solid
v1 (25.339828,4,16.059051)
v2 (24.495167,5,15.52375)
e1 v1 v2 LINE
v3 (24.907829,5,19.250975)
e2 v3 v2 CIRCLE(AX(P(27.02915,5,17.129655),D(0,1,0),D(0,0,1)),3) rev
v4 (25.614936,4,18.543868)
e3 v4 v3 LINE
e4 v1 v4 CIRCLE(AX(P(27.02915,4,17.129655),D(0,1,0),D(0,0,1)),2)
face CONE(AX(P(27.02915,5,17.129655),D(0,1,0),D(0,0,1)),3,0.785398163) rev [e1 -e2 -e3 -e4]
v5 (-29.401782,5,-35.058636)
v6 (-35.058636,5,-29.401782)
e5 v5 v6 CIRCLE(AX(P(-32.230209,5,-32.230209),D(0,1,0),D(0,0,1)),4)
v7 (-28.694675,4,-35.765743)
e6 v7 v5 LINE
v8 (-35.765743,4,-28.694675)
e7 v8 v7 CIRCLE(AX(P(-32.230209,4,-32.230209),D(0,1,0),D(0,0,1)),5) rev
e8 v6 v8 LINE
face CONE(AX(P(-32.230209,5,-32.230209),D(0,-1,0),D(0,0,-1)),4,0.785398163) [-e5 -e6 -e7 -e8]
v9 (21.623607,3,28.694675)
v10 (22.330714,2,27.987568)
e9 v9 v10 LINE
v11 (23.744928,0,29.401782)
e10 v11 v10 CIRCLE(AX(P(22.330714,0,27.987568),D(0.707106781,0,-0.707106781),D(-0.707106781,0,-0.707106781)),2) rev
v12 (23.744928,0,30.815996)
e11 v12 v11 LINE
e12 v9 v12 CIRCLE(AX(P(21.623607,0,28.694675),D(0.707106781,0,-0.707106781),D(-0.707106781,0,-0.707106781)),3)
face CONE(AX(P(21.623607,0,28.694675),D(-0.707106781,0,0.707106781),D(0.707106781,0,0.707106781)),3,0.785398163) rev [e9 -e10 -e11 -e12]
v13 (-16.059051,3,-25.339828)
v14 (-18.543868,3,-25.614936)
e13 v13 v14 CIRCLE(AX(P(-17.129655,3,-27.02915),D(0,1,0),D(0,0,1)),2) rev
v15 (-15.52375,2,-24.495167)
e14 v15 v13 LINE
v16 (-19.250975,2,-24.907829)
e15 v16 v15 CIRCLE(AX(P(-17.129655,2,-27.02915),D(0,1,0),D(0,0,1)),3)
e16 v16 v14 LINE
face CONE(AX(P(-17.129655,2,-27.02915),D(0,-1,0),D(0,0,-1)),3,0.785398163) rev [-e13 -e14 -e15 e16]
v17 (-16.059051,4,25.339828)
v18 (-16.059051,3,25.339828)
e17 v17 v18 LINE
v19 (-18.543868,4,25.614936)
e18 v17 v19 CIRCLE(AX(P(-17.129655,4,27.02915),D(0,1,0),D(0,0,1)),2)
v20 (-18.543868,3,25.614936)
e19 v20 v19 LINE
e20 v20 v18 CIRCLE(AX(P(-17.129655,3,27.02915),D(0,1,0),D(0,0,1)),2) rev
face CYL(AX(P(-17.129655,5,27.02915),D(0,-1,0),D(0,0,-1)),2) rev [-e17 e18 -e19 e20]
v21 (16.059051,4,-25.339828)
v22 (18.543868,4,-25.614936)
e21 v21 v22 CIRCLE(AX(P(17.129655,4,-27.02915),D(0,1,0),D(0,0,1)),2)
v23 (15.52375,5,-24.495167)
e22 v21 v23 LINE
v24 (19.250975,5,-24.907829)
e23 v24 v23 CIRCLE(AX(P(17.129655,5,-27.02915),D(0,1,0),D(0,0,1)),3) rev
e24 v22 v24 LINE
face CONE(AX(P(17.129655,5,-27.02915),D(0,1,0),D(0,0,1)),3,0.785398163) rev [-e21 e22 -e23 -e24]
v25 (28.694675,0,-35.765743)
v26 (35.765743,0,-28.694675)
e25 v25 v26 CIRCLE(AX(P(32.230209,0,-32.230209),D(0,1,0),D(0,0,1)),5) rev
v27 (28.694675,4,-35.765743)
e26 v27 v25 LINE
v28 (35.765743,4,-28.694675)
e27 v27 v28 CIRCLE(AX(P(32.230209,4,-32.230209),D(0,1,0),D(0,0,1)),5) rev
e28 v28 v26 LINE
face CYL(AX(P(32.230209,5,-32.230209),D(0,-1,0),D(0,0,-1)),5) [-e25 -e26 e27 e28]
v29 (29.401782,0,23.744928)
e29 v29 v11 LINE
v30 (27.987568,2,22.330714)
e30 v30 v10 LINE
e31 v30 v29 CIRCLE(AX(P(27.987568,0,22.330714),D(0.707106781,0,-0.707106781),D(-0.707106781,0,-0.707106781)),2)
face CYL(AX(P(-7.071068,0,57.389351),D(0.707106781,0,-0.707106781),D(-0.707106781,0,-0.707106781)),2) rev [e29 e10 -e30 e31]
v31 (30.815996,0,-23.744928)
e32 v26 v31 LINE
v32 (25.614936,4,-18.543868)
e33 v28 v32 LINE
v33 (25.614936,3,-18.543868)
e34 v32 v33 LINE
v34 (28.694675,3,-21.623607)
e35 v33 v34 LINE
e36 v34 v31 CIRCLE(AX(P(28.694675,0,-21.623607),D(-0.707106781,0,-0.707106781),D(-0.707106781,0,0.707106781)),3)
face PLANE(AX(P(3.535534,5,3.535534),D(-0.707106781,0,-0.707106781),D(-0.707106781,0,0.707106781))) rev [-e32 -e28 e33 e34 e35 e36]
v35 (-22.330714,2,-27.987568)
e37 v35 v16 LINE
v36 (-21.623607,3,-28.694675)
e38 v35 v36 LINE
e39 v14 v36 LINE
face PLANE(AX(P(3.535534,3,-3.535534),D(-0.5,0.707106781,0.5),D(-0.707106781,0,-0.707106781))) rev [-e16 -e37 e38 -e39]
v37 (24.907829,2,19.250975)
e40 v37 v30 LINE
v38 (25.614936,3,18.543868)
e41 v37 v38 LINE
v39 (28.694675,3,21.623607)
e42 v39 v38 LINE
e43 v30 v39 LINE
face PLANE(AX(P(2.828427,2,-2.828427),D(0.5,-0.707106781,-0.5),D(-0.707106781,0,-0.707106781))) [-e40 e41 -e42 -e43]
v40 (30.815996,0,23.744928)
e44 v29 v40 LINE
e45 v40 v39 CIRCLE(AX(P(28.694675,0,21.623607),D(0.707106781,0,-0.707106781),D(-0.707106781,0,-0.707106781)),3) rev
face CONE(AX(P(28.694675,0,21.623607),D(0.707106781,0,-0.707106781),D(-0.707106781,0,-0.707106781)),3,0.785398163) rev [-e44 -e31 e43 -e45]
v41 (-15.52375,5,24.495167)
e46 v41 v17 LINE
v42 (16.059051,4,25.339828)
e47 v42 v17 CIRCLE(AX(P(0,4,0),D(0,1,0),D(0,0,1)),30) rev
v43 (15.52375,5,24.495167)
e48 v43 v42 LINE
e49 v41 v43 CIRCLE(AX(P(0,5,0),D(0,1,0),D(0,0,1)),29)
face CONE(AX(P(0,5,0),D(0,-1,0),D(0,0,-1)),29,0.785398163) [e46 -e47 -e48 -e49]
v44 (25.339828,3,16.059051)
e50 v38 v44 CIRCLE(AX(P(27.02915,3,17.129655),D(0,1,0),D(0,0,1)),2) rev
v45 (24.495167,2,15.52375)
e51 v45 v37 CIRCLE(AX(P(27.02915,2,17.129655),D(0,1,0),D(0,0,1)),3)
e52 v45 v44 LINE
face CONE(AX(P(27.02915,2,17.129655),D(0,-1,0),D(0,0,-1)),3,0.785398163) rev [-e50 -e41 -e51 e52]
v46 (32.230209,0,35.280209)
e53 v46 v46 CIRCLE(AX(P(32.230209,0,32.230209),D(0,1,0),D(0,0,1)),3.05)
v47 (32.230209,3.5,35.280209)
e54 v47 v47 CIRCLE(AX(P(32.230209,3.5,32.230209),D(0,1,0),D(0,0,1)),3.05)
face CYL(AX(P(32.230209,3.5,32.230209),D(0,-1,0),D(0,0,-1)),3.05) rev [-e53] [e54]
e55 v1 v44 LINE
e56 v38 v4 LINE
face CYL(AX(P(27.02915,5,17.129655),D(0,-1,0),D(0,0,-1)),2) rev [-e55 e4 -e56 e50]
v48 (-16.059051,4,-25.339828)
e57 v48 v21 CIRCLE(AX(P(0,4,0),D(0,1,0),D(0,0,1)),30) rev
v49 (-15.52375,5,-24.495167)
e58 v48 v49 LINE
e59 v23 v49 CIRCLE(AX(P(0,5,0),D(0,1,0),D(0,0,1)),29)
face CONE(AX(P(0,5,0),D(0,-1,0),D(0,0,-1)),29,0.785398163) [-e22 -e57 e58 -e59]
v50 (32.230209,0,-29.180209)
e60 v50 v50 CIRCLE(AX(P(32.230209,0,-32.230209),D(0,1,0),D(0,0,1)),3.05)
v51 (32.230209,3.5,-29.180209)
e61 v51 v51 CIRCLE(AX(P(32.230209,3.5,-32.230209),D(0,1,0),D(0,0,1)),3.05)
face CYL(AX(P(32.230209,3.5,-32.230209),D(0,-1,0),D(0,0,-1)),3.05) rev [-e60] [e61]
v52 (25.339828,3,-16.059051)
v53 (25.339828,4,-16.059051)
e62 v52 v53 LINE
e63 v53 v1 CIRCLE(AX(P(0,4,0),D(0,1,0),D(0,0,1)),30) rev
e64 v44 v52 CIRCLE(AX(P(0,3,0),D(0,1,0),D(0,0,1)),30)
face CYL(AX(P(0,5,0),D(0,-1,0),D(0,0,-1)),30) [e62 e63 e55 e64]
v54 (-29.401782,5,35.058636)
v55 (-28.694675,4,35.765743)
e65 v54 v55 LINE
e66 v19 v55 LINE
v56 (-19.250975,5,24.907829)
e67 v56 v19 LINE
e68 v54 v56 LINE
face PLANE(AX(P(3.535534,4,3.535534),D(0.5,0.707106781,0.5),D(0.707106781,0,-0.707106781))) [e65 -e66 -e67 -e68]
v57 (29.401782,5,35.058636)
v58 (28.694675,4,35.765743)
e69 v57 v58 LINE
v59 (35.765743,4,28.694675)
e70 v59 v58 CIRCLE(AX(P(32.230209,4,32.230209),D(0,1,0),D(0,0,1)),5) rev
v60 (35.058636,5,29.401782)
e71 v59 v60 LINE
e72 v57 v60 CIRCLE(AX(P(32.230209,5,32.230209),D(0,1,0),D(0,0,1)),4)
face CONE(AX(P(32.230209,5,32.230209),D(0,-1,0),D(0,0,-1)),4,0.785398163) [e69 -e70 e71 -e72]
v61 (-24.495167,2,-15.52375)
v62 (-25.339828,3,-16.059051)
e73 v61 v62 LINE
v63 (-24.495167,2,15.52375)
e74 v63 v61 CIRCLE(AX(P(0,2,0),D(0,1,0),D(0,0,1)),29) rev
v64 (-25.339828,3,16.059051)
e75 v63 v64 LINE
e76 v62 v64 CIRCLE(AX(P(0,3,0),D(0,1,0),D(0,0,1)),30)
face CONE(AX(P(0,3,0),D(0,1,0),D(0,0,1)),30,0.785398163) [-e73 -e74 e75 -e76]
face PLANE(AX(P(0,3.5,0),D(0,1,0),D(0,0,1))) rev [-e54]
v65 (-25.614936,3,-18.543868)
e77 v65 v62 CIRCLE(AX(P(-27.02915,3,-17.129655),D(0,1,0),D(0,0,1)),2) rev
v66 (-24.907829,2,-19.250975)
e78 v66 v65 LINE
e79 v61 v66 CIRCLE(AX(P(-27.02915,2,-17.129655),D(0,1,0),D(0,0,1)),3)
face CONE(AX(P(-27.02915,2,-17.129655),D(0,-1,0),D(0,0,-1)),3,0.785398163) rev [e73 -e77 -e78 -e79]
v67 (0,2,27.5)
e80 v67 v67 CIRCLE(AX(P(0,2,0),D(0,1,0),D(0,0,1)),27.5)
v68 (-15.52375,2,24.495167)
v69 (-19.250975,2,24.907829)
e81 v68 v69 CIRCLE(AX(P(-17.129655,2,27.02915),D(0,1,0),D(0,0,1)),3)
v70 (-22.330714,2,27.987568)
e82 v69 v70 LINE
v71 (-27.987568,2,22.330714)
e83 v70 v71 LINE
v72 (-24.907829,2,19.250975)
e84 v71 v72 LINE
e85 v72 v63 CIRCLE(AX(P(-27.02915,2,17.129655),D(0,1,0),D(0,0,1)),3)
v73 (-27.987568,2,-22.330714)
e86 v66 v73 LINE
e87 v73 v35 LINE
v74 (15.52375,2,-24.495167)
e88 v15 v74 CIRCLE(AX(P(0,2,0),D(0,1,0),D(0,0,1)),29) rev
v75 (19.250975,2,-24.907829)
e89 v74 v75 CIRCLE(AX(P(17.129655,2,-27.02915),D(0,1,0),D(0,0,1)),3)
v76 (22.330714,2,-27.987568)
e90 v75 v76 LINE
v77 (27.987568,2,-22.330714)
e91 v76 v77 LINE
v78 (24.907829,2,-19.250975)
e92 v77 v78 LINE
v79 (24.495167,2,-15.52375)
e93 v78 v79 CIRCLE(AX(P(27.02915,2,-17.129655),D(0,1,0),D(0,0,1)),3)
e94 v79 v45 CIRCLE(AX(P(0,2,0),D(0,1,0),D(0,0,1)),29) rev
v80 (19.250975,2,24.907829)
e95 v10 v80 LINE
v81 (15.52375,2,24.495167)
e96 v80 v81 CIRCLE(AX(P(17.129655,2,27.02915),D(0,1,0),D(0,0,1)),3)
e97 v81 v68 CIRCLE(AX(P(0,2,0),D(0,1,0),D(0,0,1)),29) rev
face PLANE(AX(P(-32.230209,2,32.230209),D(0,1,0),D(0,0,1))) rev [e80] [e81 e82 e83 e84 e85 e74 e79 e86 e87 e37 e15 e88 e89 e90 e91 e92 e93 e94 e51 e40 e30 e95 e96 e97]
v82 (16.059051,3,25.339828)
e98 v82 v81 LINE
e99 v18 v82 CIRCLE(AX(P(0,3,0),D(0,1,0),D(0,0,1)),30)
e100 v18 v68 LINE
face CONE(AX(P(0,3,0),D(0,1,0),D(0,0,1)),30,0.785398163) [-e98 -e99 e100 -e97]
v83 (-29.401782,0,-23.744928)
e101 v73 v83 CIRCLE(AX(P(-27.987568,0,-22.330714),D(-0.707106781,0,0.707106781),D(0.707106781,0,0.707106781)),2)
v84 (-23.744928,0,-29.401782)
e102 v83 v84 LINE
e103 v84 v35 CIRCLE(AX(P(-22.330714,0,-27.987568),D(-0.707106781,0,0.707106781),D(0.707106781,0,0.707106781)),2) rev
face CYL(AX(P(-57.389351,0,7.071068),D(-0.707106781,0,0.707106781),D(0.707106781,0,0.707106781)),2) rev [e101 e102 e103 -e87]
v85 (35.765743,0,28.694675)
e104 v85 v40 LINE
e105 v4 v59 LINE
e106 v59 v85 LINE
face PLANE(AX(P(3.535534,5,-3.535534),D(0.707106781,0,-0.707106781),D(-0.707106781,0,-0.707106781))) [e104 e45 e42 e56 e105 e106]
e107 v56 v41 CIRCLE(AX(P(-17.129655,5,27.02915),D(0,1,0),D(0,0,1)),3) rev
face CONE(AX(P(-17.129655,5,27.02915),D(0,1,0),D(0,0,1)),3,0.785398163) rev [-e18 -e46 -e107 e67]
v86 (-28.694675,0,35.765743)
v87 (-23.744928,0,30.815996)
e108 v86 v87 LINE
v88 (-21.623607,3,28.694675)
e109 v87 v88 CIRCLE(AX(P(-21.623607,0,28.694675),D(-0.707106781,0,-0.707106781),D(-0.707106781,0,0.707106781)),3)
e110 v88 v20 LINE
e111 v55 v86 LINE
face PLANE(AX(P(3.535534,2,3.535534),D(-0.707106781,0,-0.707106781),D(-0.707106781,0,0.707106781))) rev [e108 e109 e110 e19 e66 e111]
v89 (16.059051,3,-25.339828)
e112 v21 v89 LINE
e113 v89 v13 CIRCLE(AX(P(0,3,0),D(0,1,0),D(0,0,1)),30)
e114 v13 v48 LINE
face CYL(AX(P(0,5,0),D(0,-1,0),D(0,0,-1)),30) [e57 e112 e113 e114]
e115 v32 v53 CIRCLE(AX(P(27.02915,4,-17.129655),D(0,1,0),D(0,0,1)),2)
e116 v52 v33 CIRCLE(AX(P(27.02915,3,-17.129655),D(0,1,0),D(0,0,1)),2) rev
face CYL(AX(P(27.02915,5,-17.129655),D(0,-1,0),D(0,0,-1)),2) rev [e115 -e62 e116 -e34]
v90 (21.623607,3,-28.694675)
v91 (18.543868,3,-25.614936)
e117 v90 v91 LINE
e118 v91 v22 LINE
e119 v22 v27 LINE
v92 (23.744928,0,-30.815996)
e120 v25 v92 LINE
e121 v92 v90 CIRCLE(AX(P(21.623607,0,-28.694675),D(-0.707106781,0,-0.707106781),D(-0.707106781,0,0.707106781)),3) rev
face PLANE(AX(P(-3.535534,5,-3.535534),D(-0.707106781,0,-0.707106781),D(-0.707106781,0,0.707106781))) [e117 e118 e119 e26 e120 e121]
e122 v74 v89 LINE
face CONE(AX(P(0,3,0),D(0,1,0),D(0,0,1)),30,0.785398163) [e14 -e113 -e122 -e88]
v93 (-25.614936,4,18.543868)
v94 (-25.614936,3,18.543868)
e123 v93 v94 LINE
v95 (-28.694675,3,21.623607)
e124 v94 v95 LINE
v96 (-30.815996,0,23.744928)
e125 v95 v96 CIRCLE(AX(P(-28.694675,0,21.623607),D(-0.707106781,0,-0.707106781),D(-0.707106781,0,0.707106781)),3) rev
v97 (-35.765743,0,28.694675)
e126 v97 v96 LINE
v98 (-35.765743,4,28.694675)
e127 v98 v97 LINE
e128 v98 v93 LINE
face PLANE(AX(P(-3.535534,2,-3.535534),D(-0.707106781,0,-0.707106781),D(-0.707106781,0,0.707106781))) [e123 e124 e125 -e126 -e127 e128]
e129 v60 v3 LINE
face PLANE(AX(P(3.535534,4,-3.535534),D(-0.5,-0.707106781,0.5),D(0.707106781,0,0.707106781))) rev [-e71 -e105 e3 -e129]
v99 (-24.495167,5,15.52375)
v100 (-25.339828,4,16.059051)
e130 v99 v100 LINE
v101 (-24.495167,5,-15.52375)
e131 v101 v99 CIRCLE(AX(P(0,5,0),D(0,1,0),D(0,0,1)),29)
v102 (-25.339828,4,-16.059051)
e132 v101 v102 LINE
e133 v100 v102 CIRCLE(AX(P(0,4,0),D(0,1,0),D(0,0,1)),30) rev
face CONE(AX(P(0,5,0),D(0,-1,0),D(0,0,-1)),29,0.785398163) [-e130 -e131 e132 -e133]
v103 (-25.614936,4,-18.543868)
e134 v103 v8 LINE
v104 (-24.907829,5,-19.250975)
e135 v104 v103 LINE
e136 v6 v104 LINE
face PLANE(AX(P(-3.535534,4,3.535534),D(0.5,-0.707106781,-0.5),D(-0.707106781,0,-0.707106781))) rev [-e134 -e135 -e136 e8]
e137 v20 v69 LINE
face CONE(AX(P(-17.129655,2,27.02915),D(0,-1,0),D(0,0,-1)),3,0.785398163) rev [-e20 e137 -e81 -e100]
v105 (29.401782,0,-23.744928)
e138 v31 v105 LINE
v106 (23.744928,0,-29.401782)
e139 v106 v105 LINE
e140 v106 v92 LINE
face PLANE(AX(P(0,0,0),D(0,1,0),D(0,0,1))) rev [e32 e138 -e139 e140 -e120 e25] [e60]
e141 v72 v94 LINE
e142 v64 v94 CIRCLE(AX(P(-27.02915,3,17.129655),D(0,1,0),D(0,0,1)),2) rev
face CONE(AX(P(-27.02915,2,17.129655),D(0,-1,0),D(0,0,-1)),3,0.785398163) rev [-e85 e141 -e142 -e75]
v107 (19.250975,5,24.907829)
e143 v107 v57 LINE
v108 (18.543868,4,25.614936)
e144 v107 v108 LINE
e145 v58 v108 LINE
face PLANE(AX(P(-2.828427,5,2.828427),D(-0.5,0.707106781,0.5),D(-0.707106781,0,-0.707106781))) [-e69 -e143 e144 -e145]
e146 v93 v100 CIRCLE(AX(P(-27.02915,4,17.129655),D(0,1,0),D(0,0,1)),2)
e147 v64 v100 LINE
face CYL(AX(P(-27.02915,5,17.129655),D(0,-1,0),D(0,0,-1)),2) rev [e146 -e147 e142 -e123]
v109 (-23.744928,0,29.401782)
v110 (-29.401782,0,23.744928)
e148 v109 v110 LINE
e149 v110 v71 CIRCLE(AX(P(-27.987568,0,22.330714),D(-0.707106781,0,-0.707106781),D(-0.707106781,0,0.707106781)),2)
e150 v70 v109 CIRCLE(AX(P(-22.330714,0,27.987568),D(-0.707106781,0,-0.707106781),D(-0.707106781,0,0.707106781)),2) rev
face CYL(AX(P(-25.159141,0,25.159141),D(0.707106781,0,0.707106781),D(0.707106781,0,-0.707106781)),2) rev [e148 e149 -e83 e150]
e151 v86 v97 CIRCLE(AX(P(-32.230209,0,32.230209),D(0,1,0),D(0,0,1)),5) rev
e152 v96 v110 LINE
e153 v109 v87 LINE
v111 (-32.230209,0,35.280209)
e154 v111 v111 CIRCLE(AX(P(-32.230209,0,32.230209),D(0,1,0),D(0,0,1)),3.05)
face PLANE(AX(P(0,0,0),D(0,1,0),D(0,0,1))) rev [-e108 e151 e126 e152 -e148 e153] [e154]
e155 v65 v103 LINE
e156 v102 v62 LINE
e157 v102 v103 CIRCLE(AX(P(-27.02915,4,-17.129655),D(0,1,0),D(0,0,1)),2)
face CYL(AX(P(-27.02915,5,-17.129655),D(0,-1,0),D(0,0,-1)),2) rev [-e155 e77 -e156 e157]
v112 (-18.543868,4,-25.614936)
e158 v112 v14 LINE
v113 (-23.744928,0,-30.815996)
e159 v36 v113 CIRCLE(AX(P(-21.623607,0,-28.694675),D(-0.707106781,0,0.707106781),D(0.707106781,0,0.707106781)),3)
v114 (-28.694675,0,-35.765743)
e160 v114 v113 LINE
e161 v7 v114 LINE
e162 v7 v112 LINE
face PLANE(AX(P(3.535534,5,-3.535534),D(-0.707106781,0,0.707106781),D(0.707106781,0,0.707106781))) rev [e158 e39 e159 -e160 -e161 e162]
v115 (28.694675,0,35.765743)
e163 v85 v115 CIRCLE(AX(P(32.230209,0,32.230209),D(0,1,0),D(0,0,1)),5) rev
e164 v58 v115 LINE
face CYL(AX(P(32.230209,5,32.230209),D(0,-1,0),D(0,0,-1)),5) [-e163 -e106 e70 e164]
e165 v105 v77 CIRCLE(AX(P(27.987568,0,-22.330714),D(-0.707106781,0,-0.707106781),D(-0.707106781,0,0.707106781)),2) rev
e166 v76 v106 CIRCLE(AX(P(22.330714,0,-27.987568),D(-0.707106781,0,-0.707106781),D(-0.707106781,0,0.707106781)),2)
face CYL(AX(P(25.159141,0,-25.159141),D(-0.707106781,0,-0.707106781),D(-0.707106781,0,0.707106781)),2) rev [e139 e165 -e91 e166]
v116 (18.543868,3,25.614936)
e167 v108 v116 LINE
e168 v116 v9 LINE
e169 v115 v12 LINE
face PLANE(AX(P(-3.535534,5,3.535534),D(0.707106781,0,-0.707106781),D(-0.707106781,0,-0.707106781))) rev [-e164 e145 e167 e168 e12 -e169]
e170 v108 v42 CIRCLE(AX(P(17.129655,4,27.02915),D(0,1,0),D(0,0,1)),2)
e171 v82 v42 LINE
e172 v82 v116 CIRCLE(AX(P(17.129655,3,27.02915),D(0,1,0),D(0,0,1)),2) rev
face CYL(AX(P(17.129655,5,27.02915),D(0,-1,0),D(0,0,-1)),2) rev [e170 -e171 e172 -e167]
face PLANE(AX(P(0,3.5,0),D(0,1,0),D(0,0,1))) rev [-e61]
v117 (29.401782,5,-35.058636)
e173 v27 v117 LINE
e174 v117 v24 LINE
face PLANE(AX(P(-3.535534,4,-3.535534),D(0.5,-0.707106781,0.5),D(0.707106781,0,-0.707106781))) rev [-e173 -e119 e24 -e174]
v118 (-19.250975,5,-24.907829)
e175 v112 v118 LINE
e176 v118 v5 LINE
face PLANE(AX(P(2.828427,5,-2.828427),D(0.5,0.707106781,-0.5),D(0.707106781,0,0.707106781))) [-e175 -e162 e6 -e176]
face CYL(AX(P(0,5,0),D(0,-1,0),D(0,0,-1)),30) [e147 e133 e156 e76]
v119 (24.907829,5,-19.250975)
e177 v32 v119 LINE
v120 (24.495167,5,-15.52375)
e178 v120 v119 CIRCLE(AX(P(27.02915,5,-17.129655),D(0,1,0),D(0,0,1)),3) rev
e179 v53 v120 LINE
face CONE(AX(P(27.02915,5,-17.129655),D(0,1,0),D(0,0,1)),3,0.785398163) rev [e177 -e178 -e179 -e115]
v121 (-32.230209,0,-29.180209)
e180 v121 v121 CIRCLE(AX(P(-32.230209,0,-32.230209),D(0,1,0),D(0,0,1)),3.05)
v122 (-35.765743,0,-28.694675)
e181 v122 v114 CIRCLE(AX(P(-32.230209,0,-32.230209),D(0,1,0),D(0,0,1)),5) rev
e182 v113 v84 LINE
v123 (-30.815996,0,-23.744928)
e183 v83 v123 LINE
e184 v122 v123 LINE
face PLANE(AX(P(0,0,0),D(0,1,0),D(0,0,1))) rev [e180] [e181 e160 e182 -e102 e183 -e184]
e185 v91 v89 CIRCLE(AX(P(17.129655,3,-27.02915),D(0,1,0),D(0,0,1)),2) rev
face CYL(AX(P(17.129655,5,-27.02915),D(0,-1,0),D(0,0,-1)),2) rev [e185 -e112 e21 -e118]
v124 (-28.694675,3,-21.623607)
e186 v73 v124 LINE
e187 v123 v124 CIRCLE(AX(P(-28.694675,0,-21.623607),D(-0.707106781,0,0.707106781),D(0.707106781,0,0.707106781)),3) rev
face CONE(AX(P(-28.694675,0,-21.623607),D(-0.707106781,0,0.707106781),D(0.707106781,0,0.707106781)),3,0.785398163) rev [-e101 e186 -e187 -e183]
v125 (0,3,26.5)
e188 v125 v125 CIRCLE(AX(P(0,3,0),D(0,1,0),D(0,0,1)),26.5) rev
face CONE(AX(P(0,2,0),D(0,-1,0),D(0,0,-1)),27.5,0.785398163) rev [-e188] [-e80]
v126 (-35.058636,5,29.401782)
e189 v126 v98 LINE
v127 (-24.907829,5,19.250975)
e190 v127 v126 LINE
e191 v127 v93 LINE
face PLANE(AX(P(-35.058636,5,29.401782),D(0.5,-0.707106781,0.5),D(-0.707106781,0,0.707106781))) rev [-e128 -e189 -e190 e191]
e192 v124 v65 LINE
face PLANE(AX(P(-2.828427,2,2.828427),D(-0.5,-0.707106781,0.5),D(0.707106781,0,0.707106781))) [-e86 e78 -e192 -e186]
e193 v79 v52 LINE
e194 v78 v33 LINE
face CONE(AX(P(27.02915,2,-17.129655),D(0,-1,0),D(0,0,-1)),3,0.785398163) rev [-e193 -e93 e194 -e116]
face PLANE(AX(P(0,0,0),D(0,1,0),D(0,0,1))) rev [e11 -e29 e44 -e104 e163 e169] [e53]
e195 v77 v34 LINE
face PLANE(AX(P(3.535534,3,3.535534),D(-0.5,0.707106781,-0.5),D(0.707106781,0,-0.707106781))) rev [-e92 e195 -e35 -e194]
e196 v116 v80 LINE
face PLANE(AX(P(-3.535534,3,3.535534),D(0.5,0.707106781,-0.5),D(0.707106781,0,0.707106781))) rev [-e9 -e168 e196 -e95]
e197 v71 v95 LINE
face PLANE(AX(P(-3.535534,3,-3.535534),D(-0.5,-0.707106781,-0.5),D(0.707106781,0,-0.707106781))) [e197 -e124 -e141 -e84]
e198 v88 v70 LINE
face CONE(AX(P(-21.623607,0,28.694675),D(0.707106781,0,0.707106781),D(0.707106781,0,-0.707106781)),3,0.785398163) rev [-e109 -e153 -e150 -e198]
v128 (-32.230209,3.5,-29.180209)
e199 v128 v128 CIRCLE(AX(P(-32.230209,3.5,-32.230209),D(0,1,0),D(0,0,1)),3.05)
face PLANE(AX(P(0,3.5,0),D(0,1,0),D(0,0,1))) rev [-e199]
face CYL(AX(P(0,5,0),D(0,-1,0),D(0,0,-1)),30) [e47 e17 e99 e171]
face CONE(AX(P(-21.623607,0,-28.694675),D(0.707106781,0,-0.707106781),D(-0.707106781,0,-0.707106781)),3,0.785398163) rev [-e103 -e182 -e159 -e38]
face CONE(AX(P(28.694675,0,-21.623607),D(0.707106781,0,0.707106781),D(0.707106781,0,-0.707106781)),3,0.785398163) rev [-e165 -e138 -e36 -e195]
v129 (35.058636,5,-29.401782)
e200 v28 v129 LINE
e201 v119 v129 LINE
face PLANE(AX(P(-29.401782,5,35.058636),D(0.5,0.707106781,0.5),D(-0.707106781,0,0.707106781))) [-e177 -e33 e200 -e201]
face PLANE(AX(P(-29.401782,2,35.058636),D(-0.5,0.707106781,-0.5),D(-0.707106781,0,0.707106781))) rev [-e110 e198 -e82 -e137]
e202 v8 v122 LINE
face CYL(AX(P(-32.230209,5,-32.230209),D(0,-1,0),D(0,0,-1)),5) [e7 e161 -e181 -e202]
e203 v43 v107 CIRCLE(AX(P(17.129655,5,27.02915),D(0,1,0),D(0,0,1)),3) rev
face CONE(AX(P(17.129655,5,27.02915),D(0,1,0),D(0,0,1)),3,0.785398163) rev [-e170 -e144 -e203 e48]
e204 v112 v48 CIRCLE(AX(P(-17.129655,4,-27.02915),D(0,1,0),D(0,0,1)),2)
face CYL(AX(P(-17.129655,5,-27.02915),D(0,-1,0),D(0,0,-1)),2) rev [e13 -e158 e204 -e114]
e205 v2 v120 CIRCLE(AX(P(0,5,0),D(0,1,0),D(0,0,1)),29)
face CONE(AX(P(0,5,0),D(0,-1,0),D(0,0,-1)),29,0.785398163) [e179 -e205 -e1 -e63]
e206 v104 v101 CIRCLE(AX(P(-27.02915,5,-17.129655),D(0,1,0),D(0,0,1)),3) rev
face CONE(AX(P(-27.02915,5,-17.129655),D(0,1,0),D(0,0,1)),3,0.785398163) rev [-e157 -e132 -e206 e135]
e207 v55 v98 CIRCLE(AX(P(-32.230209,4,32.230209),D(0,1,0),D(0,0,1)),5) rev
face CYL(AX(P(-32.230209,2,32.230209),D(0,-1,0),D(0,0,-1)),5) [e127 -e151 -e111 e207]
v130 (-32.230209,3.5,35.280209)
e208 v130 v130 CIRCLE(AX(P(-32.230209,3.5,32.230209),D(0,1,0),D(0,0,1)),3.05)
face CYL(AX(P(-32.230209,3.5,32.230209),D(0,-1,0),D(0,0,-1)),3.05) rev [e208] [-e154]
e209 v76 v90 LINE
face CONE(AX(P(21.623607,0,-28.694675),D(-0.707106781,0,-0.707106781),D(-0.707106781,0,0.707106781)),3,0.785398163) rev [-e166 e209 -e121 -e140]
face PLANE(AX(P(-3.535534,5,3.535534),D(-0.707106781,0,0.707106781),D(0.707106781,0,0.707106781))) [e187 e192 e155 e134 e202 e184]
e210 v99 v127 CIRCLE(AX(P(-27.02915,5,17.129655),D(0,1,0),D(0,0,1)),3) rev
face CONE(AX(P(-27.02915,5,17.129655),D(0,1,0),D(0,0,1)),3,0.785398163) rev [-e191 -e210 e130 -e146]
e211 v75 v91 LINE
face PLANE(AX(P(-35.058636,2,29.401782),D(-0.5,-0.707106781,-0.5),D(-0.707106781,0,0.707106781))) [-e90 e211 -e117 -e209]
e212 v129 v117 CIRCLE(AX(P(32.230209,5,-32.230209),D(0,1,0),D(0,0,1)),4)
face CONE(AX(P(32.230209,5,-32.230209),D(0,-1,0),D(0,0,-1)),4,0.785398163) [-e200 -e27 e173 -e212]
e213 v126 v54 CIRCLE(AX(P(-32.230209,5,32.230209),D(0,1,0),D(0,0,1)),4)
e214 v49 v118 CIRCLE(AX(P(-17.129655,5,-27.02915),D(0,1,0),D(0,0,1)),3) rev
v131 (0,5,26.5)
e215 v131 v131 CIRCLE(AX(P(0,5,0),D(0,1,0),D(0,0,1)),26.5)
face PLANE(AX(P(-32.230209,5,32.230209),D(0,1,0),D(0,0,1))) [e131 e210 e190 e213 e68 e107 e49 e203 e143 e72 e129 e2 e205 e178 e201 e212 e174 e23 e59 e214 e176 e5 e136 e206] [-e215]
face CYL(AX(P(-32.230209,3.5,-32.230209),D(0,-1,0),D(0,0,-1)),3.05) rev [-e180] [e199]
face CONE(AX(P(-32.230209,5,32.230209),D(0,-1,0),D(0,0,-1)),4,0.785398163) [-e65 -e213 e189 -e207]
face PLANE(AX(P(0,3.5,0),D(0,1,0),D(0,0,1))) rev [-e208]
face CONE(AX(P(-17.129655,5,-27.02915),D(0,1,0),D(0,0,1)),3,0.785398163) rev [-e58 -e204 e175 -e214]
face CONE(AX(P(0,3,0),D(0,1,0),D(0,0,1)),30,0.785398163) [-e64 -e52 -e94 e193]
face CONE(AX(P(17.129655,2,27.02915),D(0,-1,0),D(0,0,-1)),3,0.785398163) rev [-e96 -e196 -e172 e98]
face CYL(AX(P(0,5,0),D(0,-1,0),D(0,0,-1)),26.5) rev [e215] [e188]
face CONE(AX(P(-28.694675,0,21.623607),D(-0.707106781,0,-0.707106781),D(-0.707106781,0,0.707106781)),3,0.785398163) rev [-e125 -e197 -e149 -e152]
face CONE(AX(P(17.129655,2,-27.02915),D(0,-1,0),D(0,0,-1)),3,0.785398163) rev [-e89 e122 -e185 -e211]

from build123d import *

# Parameters (mm, degrees)
BASE_R              = 3.05
BOSS_EXTRUDE1_DEPTH = 2
BOSS_EXTRUDE2_START = 2
BASE_3_R            = 30
BASE_3_R_2          = 26.5
BASE_3_R_3          = 3.05
BOSS_EXTRUDE2_DEPTH = 3
FILLET1_R           = 2
CHAMFER1_SIZE       = 1
BASE_4_R            = 3.05
CUT_EXTRUDE1_DEPTH  = 3.5


with BuildPart() as part:
    # Base → Boss-Extrude1 (new body)
    # profile 1 of 8: a face of its own
    with BuildSketch(Plane(origin=(0, 0, 0), x_dir=(1, 0, 0), z_dir=(0, 1, 0))):
        with BuildLine():
            Line((-23.037821007, -30.108888819), (-30.108888819, -23.037821007))
            Line((-30.108888819, -23.037821007), (-35.765743068, -28.694675256))
            ThreePointArc((-35.765743068, -28.694675256), (-35.765743068, -35.765743068), (-28.694675256, -35.765743068))
            Line((-28.694675256, -35.765743068), (-23.037821007, -30.108888819))
        make_face()
        with Locations((-32.230209162, -32.230209162)):
            Circle(BASE_R, mode=Mode.SUBTRACT)
    # profile 2 of 8: a face of its own
    with BuildSketch(Plane(origin=(0, 0, 0), x_dir=(1, 0, 0), z_dir=(0, 1, 0))):
        with BuildLine():
            Line((35.765743068, -28.694675256), (30.108888819, -23.037821007))
            Line((30.108888819, -23.037821007), (23.037821007, -30.108888819))
            Line((23.037821007, -30.108888819), (28.694675256, -35.765743068))
            ThreePointArc((28.694675256, -35.765743068), (35.765743068, -35.765743068), (35.765743068, -28.694675256))
        make_face()
        with Locations((32.230209162, -32.230209162)):
            Circle(BASE_R, mode=Mode.SUBTRACT)
    # profile 3 of 8: a face of its own
    with BuildSketch(Plane(origin=(0, 0, 0), x_dir=(1, 0, 0), z_dir=(0, 1, 0))):
        with BuildLine():
            Line((28.694675256, 35.765743068), (23.037821007, 30.108888819))
            Line((23.037821007, 30.108888819), (30.108888819, 23.037821007))
            Line((30.108888819, 23.037821007), (35.765743068, 28.694675256))
            ThreePointArc((35.765743068, 28.694675256), (35.765743068, 35.765743068), (28.694675256, 35.765743068))
        make_face()
        with Locations((32.230209162, 32.230209162)):
            Circle(BASE_R, mode=Mode.SUBTRACT)
    # profile 4 of 8: a face of its own
    with BuildSketch(Plane(origin=(0, 0, 0), x_dir=(1, 0, 0), z_dir=(0, 1, 0))):
        with BuildLine():
            Line((-23.037821007, 30.108888819), (-28.694675256, 35.765743068))
            ThreePointArc((-28.694675256, 35.765743068), (-35.765743068, 35.765743068), (-35.765743068, 28.694675256))
            Line((-35.765743068, 28.694675256), (-30.108888819, 23.037821007))
            Line((-30.108888819, 23.037821007), (-23.037821007, 30.108888819))
        make_face()
        with Locations((-32.230209162, 32.230209162)):
            Circle(BASE_R, mode=Mode.SUBTRACT)
    # profile 5 of 8: a face of its own
    with BuildSketch(Plane(origin=(0, 0, 0), x_dir=(1, 0, 0), z_dir=(0, 1, 0))):
        with Locations((32.230209162, 32.230209162)):
            Circle(BASE_R)
    # profile 6 of 8: a face of its own
    with BuildSketch(Plane(origin=(0, 0, 0), x_dir=(1, 0, 0), z_dir=(0, 1, 0))):
        with Locations((-32.230209162, 32.230209162)):
            Circle(BASE_R)
    # profile 7 of 8: a face of its own
    with BuildSketch(Plane(origin=(0, 0, 0), x_dir=(1, 0, 0), z_dir=(0, 1, 0))):
        with Locations((-32.230209162, -32.230209162)):
            Circle(BASE_R)
    # profile 8 of 8: a face of its own
    with BuildSketch(Plane(origin=(0, 0, 0), x_dir=(1, 0, 0), z_dir=(0, 1, 0))):
        with Locations((32.230209162, -32.230209162)):
            Circle(BASE_R)
    extrude(amount=BOSS_EXTRUDE1_DEPTH)

    # Base<3> → Boss-Extrude2 (add)
    # profile 1 of 13: a face of its own
    with BuildSketch(Plane(origin=(0, 0, 0), x_dir=(1, 0, 0), z_dir=(0, 1, 0)).offset(BOSS_EXTRUDE2_START)):
        Circle(BASE_3_R)
        with Locations(Location((0, 0, 0), (0, 0, 270))):
            Circle(BASE_3_R_2, mode=Mode.SUBTRACT)
    # profile 2 of 13: a face of its own
    with BuildSketch(Plane(origin=(0, 0, 0), x_dir=(1, 0, 0), z_dir=(0, 1, 0)).offset(BOSS_EXTRUDE2_START)):
        with BuildLine():
            ThreePointArc((-17.380966757, -24.452034569), (-21.213203436, -21.213203436), (-24.452034569, -17.380966757))
            Line((-24.452034569, -17.380966757), (-30.108888819, -23.037821007))
            Line((-30.108888819, -23.037821007), (-23.037821007, -30.108888819))
            Line((-23.037821007, -30.108888819), (-17.380966757, -24.452034569))
        make_face()
    # profile 3 of 13: a face of its own
    with BuildSketch(Plane(origin=(0, 0, 0), x_dir=(1, 0, 0), z_dir=(0, 1, 0)).offset(BOSS_EXTRUDE2_START)):
        with BuildLine():
            Line((-23.037821007, -30.108888819), (-30.108888819, -23.037821007))
            Line((-30.108888819, -23.037821007), (-35.765743068, -28.694675256))
            ThreePointArc((-35.765743068, -28.694675256), (-35.765743068, -35.765743068), (-28.694675256, -35.765743068))
            Line((-28.694675256, -35.765743068), (-23.037821007, -30.108888819))
        make_face()
        with Locations((-32.230209162, -32.230209162)):
            Circle(BASE_3_R_3, mode=Mode.SUBTRACT)
    # profile 4 of 13: a face of its own
    with BuildSketch(Plane(origin=(0, 0, 0), x_dir=(1, 0, 0), z_dir=(0, 1, 0)).offset(BOSS_EXTRUDE2_START)):
        with BuildLine():
            Line((30.108888819, -23.037821007), (24.452034569, -17.380966757))
            ThreePointArc((24.452034569, -17.380966757), (21.213203436, -21.213203436), (17.380966757, -24.452034569))
            Line((17.380966757, -24.452034569), (23.037821007, -30.108888819))
            Line((23.037821007, -30.108888819), (30.108888819, -23.037821007))
        make_face()
    # profile 5 of 13: a face of its own
    with BuildSketch(Plane(origin=(0, 0, 0), x_dir=(1, 0, 0), z_dir=(0, 1, 0)).offset(BOSS_EXTRUDE2_START)):
        with BuildLine():
            Line((35.765743068, -28.694675256), (30.108888819, -23.037821007))
            Line((30.108888819, -23.037821007), (23.037821007, -30.108888819))
            Line((23.037821007, -30.108888819), (28.694675256, -35.765743068))
            ThreePointArc((28.694675256, -35.765743068), (35.765743068, -35.765743068), (35.765743068, -28.694675256))
        make_face()
        with Locations((32.230209162, -32.230209162)):
            Circle(BASE_3_R_3, mode=Mode.SUBTRACT)
    # profile 6 of 13: a face of its own
    with BuildSketch(Plane(origin=(0, 0, 0), x_dir=(1, 0, 0), z_dir=(0, 1, 0)).offset(BOSS_EXTRUDE2_START)):
        with BuildLine():
            Line((23.037821007, 30.108888819), (17.380966757, 24.452034569))
            ThreePointArc((17.380966757, 24.452034569), (21.213203436, 21.213203436), (24.452034569, 17.380966757))
            Line((24.452034569, 17.380966757), (30.108888819, 23.037821007))
            Line((30.108888819, 23.037821007), (23.037821007, 30.108888819))
        make_face()
    # profile 7 of 13: a face of its own
    with BuildSketch(Plane(origin=(0, 0, 0), x_dir=(1, 0, 0), z_dir=(0, 1, 0)).offset(BOSS_EXTRUDE2_START)):
        with BuildLine():
            Line((28.694675256, 35.765743068), (23.037821007, 30.108888819))
            Line((23.037821007, 30.108888819), (30.108888819, 23.037821007))
            Line((30.108888819, 23.037821007), (35.765743068, 28.694675256))
            ThreePointArc((35.765743068, 28.694675256), (35.765743068, 35.765743068), (28.694675256, 35.765743068))
        make_face()
        with Locations((32.230209162, 32.230209162)):
            Circle(BASE_3_R_3, mode=Mode.SUBTRACT)
    # profile 8 of 13: a face of its own
    with BuildSketch(Plane(origin=(0, 0, 0), x_dir=(1, 0, 0), z_dir=(0, 1, 0)).offset(BOSS_EXTRUDE2_START)):
        with BuildLine():
            Line((-17.380966757, 24.452034569), (-23.037821007, 30.108888819))
            Line((-23.037821007, 30.108888819), (-30.108888819, 23.037821007))
            Line((-30.108888819, 23.037821007), (-24.452034569, 17.380966757))
            ThreePointArc((-24.452034569, 17.380966757), (-21.213203436, 21.213203436), (-17.380966757, 24.452034569))
        make_face()
    # profile 9 of 13: a face of its own
    with BuildSketch(Plane(origin=(0, 0, 0), x_dir=(1, 0, 0), z_dir=(0, 1, 0)).offset(BOSS_EXTRUDE2_START)):
        with BuildLine():
            Line((-23.037821007, 30.108888819), (-28.694675256, 35.765743068))
            ThreePointArc((-28.694675256, 35.765743068), (-35.765743068, 35.765743068), (-35.765743068, 28.694675256))
            Line((-35.765743068, 28.694675256), (-30.108888819, 23.037821007))
            Line((-30.108888819, 23.037821007), (-23.037821007, 30.108888819))
        make_face()
        with Locations((-32.230209162, 32.230209162)):
            Circle(BASE_3_R_3, mode=Mode.SUBTRACT)
    # profile 10 of 13: a face of its own
    with BuildSketch(Plane(origin=(0, 0, 0), x_dir=(1, 0, 0), z_dir=(0, 1, 0)).offset(BOSS_EXTRUDE2_START)):
        with Locations((-32.230209162, 32.230209162)):
            Circle(BASE_3_R_3)
    # profile 11 of 13: a face of its own
    with BuildSketch(Plane(origin=(0, 0, 0), x_dir=(1, 0, 0), z_dir=(0, 1, 0)).offset(BOSS_EXTRUDE2_START)):
        with Locations((-32.230209162, -32.230209162)):
            Circle(BASE_3_R_3)
    # profile 12 of 13: a face of its own
    with BuildSketch(Plane(origin=(0, 0, 0), x_dir=(1, 0, 0), z_dir=(0, 1, 0)).offset(BOSS_EXTRUDE2_START)):
        with Locations((32.230209162, -32.230209162)):
            Circle(BASE_3_R_3)
    # profile 13 of 13: a face of its own
    with BuildSketch(Plane(origin=(0, 0, 0), x_dir=(1, 0, 0), z_dir=(0, 1, 0)).offset(BOSS_EXTRUDE2_START)):
        with Locations((32.230209162, 32.230209162)):
            Circle(BASE_3_R_3)
    extrude(amount=BOSS_EXTRUDE2_DEPTH)

    # Fillet1
    fillet1_edges = [part.edges().sort_by_distance(p)[0] for p in [
        (24.452034569, 3.5, 17.380966757),
        (-17.380966757, 3.5, -24.452034569),
        (24.452034569, 3.5, -17.380966757),
        (-17.380966757, 3.5, 24.452034569),
        (17.380966757, 3.5, -24.452034569),
        (-24.452034569, 3.5, 17.380966757),
        (17.380966757, 3.5, 24.452034569),
        (-24.452034569, 3.5, -17.380966757),
        (-26.573354913, 2, 26.573354913),
        (-26.573354913, 2, -26.573354913),
        (26.573354913, 2, 26.573354913),
        (26.573354913, 2, -26.573354913),
    ]]
    fillet(fillet1_edges, radius=FILLET1_R - 0.0001)  # a hair under: the kernel refuses the full size

    # Chamfer1
    chamfer1_edges = [part.edges().sort_by_distance(p)[0] for p in [
        (23.619243451, 5, 30.690311263),
        (0, 5, 30),
        (-23.619243451, 5, 30.690311263),
        (-30.690311263, 5, 23.619243451),
        (-30, 5, 0),
        (-30.690311263, 5, -23.619243451),
        (-23.619243451, 5, -30.690311263),
        (0, 5, -30),
        (30.690311263, 5, -23.619243451),
        (30, 5, 0),
        (30.690311263, 5, 23.619243451),
        (23.619243451, 5, -30.690311263),
        (-29.694695967, 1.414242852, 22.623628155),
        (-22.623628155, 1.414242852, 29.694695967),
        (-22.623628155, 1.414242852, -29.694695967),
        (-29.694695967, 1.414242852, -22.623628155),
        (22.623628155, 1.414242852, 29.694695967),
        (29.694695967, 1.414242852, 22.623628155),
        (29.694695967, 1.414242852, -22.623628155),
        (22.623628155, 1.414242852, -29.694695967),
        (17.349741935, 2, 25.041267842),
        (17.349741935, 5, 25.041267842),
        (-17.349741935, 2, 25.041267842),
        (-17.349741935, 5, 25.041267842),
        (-25.041267842, 2, 17.349741935),
        (-25.041267842, 5, 17.349741935),
        (-25.041267842, 2, -17.349741935),
        (-25.041267842, 5, -17.349741935),
        (-17.349741935, 2, -25.041267842),
        (-17.349741935, 5, -25.041267842),
        (25.041267842, 2, -17.349741935),
        (25.041267842, 5, -17.349741935),
        (25.041267842, 2, 17.349741935),
        (25.041267842, 5, 17.349741935),
        (17.349741935, 2, -25.041267842),
        (17.349741935, 5, -25.041267842),
        (0, 2, -26.5),
        (35.765743068, 5, 35.765743068),
        (35.765743068, 5, -35.765743068),
        (-35.765743068, 5, -35.765743068),
        (-35.765743068, 5, 35.765743068),
        (-20.083744901, 2, -27.154812712),
        (0, 2, -30),
        (20.083744901, 2, -27.154812712),
        (27.154812712, 2, -20.083744901),
        (30, 2, 0),
        (27.154812712, 2, 20.083744901),
        (20.083744901, 2, 27.154812712),
        (0, 2, 30),
        (-20.083744901, 2, 27.154812712),
        (-27.154812712, 2, 20.083744901),
        (-30, 2, 0),
        (-27.154812712, 2, -20.083744901),
    ]]
    chamfer(chamfer1_edges, length=CHAMFER1_SIZE)

    # Base<4> → Cut-Extrude1 (cut)
    with BuildSketch(Plane(origin=(0, 0, 0), x_dir=(1, 0, 0), z_dir=(0, 1, 0))):
        with Locations(Location((32.230209162, -32.230209162, 0), (0, 0, 270))):
            Circle(BASE_4_R)
        with Locations(Location((-32.230209162, -32.230209162, 0), (0, 0, 270))):
            Circle(BASE_4_R)
        with Locations(Location((-32.230209162, 32.230209162, 0), (0, 0, 270))):
            Circle(BASE_4_R)
        with Locations(Location((32.230209162, 32.230209162, 0), (0, 0, 270))):
            Circle(BASE_4_R)
    extrude(amount=CUT_EXTRUDE1_DEPTH, mode=Mode.SUBTRACT)


solid = part.part
